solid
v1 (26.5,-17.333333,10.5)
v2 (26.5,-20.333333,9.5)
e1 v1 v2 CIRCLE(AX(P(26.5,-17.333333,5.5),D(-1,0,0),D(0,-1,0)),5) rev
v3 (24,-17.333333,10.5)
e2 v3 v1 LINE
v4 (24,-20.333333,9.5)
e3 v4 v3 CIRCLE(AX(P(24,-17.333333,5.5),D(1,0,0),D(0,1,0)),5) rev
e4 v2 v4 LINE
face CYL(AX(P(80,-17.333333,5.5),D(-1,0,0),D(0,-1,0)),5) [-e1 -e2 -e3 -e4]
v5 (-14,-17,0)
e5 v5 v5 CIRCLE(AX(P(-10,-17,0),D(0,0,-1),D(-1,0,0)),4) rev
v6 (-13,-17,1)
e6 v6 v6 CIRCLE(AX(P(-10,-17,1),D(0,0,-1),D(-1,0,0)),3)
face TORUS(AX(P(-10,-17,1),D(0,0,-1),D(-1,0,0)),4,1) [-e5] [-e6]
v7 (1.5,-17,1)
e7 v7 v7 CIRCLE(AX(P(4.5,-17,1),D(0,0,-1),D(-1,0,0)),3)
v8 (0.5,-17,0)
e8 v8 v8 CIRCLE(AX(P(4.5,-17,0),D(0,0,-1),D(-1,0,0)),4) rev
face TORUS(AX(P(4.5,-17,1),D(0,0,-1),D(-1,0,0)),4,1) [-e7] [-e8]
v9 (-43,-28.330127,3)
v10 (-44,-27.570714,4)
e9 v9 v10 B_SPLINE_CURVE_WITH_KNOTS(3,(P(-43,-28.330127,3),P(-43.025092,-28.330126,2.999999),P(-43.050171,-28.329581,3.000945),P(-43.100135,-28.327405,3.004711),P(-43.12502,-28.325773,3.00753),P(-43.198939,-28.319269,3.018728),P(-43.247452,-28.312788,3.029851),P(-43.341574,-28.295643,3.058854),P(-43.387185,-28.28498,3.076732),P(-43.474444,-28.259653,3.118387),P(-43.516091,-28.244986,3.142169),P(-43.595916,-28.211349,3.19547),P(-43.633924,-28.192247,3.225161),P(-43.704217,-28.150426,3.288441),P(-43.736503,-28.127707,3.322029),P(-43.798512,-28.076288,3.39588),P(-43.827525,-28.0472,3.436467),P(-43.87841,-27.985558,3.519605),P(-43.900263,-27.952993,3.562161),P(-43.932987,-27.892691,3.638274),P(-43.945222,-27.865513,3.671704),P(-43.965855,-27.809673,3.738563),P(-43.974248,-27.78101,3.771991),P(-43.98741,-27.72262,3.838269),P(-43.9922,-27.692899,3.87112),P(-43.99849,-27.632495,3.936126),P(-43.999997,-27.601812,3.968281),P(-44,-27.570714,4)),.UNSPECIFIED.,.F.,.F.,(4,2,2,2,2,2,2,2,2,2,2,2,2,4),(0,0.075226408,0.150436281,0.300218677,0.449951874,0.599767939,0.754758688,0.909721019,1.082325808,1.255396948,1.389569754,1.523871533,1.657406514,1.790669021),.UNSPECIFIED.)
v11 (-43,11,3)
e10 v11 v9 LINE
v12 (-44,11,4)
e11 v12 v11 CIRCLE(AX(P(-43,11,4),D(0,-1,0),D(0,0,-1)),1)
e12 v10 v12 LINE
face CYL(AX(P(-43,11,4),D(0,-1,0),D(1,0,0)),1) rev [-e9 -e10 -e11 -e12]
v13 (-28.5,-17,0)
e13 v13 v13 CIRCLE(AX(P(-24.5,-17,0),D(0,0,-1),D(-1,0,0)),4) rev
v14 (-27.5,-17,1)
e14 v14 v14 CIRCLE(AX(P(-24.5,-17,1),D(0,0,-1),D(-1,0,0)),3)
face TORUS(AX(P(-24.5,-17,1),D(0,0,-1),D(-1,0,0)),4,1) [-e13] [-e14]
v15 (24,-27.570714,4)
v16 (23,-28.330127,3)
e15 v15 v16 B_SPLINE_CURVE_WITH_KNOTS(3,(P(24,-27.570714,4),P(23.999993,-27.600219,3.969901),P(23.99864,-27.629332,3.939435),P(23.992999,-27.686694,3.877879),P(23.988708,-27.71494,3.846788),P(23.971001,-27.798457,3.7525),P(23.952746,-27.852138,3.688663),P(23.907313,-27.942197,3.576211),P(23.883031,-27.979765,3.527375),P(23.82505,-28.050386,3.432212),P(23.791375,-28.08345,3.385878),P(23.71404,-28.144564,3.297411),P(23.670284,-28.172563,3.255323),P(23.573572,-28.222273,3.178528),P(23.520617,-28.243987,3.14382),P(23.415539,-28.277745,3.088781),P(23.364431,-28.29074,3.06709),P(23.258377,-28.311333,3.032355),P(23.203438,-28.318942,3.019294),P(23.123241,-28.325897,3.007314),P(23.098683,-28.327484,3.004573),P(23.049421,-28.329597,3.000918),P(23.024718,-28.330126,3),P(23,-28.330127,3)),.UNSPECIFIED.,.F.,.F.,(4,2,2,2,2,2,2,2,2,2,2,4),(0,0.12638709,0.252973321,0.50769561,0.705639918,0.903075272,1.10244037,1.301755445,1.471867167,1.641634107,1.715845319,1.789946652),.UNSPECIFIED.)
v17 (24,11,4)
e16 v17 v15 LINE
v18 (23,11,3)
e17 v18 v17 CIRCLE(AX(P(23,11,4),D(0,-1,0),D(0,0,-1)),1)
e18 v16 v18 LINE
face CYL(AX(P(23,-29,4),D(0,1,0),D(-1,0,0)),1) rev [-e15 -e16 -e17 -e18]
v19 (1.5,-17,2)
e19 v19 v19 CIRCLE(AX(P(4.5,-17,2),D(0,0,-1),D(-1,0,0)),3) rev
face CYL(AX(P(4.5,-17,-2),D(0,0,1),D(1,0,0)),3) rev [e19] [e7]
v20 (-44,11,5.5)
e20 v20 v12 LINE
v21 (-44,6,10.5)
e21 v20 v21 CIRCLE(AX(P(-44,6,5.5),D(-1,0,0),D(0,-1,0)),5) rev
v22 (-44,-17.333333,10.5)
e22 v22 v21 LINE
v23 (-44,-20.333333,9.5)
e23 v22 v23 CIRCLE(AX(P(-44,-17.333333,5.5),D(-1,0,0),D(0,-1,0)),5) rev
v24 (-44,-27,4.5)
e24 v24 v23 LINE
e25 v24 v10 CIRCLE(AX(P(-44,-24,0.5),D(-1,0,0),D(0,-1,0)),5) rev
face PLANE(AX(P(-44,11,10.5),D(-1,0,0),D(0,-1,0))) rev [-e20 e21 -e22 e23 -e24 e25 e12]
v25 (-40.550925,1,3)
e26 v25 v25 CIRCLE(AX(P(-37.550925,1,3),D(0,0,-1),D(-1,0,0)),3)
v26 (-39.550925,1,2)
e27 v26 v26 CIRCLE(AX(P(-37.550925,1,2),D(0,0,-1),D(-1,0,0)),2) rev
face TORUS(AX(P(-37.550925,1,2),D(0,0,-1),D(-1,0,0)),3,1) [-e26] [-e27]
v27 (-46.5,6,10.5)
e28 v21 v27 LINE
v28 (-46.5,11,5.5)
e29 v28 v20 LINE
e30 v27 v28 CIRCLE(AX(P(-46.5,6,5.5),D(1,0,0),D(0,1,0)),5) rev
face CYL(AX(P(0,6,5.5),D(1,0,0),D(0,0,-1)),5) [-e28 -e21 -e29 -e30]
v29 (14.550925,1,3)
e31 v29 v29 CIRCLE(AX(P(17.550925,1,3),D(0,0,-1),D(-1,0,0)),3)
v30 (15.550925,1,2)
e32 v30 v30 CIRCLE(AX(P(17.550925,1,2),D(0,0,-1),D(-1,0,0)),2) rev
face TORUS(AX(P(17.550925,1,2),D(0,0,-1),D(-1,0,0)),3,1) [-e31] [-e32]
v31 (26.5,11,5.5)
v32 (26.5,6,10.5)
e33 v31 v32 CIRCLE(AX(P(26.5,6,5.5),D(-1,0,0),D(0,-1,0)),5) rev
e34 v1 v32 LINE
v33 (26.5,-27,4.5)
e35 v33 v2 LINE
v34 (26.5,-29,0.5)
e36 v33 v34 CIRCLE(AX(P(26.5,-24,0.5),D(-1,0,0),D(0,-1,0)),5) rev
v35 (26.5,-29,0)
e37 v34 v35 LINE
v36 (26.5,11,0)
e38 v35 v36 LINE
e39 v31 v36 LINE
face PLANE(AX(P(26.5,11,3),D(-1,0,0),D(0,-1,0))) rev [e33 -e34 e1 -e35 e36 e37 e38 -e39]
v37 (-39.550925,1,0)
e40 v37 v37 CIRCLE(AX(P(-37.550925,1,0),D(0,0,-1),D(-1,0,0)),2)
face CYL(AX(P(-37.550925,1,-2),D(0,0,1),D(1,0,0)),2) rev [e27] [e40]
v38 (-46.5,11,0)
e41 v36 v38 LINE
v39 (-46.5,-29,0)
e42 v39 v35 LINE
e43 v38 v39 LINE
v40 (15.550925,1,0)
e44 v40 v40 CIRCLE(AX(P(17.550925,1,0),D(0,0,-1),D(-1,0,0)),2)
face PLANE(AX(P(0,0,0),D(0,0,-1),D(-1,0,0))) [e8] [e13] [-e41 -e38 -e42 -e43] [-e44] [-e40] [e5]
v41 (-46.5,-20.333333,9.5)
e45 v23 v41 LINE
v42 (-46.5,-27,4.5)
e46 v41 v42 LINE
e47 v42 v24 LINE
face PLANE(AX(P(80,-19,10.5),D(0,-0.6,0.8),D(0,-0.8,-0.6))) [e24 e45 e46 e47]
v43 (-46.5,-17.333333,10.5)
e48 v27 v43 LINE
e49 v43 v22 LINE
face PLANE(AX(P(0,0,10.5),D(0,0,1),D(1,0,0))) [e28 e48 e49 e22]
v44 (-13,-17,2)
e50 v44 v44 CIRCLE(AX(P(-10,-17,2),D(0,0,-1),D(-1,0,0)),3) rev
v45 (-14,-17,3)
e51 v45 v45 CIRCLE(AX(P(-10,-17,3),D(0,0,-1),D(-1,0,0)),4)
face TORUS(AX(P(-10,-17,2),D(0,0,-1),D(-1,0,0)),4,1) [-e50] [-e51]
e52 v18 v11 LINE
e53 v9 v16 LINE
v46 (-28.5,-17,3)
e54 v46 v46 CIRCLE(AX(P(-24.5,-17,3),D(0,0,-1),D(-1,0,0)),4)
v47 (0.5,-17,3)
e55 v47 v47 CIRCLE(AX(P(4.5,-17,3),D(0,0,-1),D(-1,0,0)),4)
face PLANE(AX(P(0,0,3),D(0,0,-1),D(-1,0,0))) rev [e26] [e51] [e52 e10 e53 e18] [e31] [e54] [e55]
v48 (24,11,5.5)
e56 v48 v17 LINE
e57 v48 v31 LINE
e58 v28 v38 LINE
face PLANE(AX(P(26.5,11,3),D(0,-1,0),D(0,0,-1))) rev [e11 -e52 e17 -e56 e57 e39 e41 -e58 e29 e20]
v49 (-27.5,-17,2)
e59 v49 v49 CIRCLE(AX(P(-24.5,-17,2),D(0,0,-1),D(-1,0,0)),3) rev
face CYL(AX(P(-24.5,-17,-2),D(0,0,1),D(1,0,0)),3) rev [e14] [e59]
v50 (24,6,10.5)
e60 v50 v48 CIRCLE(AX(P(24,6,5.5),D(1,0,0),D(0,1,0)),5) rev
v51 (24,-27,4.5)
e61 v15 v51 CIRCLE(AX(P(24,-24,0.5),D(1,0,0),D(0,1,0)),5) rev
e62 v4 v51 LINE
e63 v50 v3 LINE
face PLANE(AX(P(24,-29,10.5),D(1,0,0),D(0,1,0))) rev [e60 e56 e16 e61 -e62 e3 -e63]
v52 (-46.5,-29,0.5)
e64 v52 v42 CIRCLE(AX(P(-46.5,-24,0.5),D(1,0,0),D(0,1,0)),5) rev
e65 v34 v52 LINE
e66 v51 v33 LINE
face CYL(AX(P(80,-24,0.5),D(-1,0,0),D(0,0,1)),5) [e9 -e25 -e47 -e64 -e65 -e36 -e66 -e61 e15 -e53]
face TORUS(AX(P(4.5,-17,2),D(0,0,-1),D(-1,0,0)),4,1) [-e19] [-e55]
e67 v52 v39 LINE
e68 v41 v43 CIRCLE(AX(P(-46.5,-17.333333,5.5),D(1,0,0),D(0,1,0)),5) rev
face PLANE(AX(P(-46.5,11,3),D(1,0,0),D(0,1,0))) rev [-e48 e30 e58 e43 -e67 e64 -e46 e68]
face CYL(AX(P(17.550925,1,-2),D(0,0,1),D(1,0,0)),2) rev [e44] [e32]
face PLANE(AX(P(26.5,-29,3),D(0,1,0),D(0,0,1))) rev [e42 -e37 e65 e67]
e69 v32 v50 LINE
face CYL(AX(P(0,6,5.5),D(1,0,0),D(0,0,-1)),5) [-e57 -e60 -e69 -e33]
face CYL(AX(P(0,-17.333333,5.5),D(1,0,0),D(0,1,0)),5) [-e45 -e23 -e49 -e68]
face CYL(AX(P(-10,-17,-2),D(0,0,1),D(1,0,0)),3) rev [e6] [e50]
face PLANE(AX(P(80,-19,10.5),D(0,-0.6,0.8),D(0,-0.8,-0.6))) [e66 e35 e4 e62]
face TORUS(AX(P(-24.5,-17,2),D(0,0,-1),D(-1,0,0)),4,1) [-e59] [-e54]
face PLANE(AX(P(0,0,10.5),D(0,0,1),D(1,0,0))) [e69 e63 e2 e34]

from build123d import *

# Parameters (mm, degrees)
SKETCH2_W               = 73
SKETCH2_H               = 40
BOSS_EXTRUDE1_DEPTH     = 3
SKETCH3_W               = 2.5
SKETCH3_H               = 40
BOSS_EXTRUDE2_DEPTH     = 7.5
CUT_EXTRUDE1_DEPTH      = 124
CUT_EXTRUDE1_DEPTH_BACK = 5
FILLET1_START           = -47
FILLET1_DEPTH           = 74
FILLET3_R               = 5
FILLET4_R               = 1
SKETCH5_R               = 2
SKETCH5_R_2             = 3
CUT_EXTRUDE2_DEPTH      = 5
FILLET5_R               = 1


with BuildPart() as part:
    # Sketch2 → Boss-Extrude1 (new body)
    with BuildSketch(Plane.XY):
        with Locations((-10, -9)):
            Rectangle(SKETCH2_W, SKETCH2_H)
    extrude(amount=BOSS_EXTRUDE1_DEPTH)

    # Sketch3 → Boss-Extrude2 (add)
    with BuildSketch(Plane.XY.offset(3)):
        with Locations((-45.25, -9)):
            Rectangle(SKETCH3_W, SKETCH3_H)
        with Locations((25.25, -9)):
            Rectangle(SKETCH3_W, SKETCH3_H)
    extrude(amount=BOSS_EXTRUDE2_DEPTH)

    # Sketch4 → Cut-Extrude1 (cut, two sides: drawn at the far end of the back side and taken through both)
    with BuildSketch(Plane(origin=(-44, 0, 0), x_dir=(0, 0, -1), z_dir=(1, 0, 0)).offset(-CUT_EXTRUDE1_DEPTH_BACK)):
        Polygon((-3, -29), (-10.5, -29), (-10.5, -19), align=None)
    extrude(amount=CUT_EXTRUDE1_DEPTH + CUT_EXTRUDE1_DEPTH_BACK, mode=Mode.SUBTRACT)

    # Fillet1: read off the stored shape, not the designer's step
    # Fillet1 outline → Fillet1 (cut)
    with BuildSketch(Plane.YZ.offset(FILLET1_START)):
        with BuildLine():
            Line((-29, 3), (-29, 0.5))
            ThreePointArc((-29, 0.5), (-28.472135955, 2.736067977), (-27, 4.5))
            Line((-27, 4.5), (-29, 3))
        make_face()
    extrude(amount=FILLET1_DEPTH, mode=Mode.SUBTRACT)

    # Fillet3
    fillet3_edges = [part.edges().sort_by_distance(p)[0] for p in [
        (-45.25, 11, 10.5),
        (25.25, 11, 10.5),
        (-45.25, -19, 10.5),
        (25.25, -19, 10.5),
    ]]
    fillet(fillet3_edges, radius=FILLET3_R)

    # Fillet4
    fillet4_edges = [part.edges().sort_by_distance(p)[0] for p in [
        (24, -8.665063509, 3),
        (-44, -8.665063509, 3),
    ]]
    fillet(fillet4_edges, radius=FILLET4_R)

    # Sketch5 → Cut-Extrude2 (cut)
    with BuildSketch(Plane.XY.offset(3)):
        with Locations((-37.550924627, 1)):
            Circle(SKETCH5_R)
        with Locations((17.550924627, 1)):
            Circle(SKETCH5_R)
        with Locations((4.5, -17)):
            Circle(SKETCH5_R_2)
        with Locations((-10, -17)):
            Circle(SKETCH5_R_2)
        with Locations((-24.5, -17)):
            Circle(SKETCH5_R_2)
    extrude(amount=-CUT_EXTRUDE2_DEPTH, mode=Mode.SUBTRACT)

    # Fillet5
    fillet5_edges = [part.edges().sort_by_distance(p)[0] for p in [
        (-39.550924627, 1, 3),
        (15.550924627, 1, 3),
        (1.5, -17, 0),
        (1.5, -17, 3),
        (-13, -17, 0),
        (-13, -17, 3),
        (-27.5, -17, 0),
        (-27.5, -17, 3),
    ]]
    fillet(fillet5_edges, radius=FILLET5_R)


solid = part.part
